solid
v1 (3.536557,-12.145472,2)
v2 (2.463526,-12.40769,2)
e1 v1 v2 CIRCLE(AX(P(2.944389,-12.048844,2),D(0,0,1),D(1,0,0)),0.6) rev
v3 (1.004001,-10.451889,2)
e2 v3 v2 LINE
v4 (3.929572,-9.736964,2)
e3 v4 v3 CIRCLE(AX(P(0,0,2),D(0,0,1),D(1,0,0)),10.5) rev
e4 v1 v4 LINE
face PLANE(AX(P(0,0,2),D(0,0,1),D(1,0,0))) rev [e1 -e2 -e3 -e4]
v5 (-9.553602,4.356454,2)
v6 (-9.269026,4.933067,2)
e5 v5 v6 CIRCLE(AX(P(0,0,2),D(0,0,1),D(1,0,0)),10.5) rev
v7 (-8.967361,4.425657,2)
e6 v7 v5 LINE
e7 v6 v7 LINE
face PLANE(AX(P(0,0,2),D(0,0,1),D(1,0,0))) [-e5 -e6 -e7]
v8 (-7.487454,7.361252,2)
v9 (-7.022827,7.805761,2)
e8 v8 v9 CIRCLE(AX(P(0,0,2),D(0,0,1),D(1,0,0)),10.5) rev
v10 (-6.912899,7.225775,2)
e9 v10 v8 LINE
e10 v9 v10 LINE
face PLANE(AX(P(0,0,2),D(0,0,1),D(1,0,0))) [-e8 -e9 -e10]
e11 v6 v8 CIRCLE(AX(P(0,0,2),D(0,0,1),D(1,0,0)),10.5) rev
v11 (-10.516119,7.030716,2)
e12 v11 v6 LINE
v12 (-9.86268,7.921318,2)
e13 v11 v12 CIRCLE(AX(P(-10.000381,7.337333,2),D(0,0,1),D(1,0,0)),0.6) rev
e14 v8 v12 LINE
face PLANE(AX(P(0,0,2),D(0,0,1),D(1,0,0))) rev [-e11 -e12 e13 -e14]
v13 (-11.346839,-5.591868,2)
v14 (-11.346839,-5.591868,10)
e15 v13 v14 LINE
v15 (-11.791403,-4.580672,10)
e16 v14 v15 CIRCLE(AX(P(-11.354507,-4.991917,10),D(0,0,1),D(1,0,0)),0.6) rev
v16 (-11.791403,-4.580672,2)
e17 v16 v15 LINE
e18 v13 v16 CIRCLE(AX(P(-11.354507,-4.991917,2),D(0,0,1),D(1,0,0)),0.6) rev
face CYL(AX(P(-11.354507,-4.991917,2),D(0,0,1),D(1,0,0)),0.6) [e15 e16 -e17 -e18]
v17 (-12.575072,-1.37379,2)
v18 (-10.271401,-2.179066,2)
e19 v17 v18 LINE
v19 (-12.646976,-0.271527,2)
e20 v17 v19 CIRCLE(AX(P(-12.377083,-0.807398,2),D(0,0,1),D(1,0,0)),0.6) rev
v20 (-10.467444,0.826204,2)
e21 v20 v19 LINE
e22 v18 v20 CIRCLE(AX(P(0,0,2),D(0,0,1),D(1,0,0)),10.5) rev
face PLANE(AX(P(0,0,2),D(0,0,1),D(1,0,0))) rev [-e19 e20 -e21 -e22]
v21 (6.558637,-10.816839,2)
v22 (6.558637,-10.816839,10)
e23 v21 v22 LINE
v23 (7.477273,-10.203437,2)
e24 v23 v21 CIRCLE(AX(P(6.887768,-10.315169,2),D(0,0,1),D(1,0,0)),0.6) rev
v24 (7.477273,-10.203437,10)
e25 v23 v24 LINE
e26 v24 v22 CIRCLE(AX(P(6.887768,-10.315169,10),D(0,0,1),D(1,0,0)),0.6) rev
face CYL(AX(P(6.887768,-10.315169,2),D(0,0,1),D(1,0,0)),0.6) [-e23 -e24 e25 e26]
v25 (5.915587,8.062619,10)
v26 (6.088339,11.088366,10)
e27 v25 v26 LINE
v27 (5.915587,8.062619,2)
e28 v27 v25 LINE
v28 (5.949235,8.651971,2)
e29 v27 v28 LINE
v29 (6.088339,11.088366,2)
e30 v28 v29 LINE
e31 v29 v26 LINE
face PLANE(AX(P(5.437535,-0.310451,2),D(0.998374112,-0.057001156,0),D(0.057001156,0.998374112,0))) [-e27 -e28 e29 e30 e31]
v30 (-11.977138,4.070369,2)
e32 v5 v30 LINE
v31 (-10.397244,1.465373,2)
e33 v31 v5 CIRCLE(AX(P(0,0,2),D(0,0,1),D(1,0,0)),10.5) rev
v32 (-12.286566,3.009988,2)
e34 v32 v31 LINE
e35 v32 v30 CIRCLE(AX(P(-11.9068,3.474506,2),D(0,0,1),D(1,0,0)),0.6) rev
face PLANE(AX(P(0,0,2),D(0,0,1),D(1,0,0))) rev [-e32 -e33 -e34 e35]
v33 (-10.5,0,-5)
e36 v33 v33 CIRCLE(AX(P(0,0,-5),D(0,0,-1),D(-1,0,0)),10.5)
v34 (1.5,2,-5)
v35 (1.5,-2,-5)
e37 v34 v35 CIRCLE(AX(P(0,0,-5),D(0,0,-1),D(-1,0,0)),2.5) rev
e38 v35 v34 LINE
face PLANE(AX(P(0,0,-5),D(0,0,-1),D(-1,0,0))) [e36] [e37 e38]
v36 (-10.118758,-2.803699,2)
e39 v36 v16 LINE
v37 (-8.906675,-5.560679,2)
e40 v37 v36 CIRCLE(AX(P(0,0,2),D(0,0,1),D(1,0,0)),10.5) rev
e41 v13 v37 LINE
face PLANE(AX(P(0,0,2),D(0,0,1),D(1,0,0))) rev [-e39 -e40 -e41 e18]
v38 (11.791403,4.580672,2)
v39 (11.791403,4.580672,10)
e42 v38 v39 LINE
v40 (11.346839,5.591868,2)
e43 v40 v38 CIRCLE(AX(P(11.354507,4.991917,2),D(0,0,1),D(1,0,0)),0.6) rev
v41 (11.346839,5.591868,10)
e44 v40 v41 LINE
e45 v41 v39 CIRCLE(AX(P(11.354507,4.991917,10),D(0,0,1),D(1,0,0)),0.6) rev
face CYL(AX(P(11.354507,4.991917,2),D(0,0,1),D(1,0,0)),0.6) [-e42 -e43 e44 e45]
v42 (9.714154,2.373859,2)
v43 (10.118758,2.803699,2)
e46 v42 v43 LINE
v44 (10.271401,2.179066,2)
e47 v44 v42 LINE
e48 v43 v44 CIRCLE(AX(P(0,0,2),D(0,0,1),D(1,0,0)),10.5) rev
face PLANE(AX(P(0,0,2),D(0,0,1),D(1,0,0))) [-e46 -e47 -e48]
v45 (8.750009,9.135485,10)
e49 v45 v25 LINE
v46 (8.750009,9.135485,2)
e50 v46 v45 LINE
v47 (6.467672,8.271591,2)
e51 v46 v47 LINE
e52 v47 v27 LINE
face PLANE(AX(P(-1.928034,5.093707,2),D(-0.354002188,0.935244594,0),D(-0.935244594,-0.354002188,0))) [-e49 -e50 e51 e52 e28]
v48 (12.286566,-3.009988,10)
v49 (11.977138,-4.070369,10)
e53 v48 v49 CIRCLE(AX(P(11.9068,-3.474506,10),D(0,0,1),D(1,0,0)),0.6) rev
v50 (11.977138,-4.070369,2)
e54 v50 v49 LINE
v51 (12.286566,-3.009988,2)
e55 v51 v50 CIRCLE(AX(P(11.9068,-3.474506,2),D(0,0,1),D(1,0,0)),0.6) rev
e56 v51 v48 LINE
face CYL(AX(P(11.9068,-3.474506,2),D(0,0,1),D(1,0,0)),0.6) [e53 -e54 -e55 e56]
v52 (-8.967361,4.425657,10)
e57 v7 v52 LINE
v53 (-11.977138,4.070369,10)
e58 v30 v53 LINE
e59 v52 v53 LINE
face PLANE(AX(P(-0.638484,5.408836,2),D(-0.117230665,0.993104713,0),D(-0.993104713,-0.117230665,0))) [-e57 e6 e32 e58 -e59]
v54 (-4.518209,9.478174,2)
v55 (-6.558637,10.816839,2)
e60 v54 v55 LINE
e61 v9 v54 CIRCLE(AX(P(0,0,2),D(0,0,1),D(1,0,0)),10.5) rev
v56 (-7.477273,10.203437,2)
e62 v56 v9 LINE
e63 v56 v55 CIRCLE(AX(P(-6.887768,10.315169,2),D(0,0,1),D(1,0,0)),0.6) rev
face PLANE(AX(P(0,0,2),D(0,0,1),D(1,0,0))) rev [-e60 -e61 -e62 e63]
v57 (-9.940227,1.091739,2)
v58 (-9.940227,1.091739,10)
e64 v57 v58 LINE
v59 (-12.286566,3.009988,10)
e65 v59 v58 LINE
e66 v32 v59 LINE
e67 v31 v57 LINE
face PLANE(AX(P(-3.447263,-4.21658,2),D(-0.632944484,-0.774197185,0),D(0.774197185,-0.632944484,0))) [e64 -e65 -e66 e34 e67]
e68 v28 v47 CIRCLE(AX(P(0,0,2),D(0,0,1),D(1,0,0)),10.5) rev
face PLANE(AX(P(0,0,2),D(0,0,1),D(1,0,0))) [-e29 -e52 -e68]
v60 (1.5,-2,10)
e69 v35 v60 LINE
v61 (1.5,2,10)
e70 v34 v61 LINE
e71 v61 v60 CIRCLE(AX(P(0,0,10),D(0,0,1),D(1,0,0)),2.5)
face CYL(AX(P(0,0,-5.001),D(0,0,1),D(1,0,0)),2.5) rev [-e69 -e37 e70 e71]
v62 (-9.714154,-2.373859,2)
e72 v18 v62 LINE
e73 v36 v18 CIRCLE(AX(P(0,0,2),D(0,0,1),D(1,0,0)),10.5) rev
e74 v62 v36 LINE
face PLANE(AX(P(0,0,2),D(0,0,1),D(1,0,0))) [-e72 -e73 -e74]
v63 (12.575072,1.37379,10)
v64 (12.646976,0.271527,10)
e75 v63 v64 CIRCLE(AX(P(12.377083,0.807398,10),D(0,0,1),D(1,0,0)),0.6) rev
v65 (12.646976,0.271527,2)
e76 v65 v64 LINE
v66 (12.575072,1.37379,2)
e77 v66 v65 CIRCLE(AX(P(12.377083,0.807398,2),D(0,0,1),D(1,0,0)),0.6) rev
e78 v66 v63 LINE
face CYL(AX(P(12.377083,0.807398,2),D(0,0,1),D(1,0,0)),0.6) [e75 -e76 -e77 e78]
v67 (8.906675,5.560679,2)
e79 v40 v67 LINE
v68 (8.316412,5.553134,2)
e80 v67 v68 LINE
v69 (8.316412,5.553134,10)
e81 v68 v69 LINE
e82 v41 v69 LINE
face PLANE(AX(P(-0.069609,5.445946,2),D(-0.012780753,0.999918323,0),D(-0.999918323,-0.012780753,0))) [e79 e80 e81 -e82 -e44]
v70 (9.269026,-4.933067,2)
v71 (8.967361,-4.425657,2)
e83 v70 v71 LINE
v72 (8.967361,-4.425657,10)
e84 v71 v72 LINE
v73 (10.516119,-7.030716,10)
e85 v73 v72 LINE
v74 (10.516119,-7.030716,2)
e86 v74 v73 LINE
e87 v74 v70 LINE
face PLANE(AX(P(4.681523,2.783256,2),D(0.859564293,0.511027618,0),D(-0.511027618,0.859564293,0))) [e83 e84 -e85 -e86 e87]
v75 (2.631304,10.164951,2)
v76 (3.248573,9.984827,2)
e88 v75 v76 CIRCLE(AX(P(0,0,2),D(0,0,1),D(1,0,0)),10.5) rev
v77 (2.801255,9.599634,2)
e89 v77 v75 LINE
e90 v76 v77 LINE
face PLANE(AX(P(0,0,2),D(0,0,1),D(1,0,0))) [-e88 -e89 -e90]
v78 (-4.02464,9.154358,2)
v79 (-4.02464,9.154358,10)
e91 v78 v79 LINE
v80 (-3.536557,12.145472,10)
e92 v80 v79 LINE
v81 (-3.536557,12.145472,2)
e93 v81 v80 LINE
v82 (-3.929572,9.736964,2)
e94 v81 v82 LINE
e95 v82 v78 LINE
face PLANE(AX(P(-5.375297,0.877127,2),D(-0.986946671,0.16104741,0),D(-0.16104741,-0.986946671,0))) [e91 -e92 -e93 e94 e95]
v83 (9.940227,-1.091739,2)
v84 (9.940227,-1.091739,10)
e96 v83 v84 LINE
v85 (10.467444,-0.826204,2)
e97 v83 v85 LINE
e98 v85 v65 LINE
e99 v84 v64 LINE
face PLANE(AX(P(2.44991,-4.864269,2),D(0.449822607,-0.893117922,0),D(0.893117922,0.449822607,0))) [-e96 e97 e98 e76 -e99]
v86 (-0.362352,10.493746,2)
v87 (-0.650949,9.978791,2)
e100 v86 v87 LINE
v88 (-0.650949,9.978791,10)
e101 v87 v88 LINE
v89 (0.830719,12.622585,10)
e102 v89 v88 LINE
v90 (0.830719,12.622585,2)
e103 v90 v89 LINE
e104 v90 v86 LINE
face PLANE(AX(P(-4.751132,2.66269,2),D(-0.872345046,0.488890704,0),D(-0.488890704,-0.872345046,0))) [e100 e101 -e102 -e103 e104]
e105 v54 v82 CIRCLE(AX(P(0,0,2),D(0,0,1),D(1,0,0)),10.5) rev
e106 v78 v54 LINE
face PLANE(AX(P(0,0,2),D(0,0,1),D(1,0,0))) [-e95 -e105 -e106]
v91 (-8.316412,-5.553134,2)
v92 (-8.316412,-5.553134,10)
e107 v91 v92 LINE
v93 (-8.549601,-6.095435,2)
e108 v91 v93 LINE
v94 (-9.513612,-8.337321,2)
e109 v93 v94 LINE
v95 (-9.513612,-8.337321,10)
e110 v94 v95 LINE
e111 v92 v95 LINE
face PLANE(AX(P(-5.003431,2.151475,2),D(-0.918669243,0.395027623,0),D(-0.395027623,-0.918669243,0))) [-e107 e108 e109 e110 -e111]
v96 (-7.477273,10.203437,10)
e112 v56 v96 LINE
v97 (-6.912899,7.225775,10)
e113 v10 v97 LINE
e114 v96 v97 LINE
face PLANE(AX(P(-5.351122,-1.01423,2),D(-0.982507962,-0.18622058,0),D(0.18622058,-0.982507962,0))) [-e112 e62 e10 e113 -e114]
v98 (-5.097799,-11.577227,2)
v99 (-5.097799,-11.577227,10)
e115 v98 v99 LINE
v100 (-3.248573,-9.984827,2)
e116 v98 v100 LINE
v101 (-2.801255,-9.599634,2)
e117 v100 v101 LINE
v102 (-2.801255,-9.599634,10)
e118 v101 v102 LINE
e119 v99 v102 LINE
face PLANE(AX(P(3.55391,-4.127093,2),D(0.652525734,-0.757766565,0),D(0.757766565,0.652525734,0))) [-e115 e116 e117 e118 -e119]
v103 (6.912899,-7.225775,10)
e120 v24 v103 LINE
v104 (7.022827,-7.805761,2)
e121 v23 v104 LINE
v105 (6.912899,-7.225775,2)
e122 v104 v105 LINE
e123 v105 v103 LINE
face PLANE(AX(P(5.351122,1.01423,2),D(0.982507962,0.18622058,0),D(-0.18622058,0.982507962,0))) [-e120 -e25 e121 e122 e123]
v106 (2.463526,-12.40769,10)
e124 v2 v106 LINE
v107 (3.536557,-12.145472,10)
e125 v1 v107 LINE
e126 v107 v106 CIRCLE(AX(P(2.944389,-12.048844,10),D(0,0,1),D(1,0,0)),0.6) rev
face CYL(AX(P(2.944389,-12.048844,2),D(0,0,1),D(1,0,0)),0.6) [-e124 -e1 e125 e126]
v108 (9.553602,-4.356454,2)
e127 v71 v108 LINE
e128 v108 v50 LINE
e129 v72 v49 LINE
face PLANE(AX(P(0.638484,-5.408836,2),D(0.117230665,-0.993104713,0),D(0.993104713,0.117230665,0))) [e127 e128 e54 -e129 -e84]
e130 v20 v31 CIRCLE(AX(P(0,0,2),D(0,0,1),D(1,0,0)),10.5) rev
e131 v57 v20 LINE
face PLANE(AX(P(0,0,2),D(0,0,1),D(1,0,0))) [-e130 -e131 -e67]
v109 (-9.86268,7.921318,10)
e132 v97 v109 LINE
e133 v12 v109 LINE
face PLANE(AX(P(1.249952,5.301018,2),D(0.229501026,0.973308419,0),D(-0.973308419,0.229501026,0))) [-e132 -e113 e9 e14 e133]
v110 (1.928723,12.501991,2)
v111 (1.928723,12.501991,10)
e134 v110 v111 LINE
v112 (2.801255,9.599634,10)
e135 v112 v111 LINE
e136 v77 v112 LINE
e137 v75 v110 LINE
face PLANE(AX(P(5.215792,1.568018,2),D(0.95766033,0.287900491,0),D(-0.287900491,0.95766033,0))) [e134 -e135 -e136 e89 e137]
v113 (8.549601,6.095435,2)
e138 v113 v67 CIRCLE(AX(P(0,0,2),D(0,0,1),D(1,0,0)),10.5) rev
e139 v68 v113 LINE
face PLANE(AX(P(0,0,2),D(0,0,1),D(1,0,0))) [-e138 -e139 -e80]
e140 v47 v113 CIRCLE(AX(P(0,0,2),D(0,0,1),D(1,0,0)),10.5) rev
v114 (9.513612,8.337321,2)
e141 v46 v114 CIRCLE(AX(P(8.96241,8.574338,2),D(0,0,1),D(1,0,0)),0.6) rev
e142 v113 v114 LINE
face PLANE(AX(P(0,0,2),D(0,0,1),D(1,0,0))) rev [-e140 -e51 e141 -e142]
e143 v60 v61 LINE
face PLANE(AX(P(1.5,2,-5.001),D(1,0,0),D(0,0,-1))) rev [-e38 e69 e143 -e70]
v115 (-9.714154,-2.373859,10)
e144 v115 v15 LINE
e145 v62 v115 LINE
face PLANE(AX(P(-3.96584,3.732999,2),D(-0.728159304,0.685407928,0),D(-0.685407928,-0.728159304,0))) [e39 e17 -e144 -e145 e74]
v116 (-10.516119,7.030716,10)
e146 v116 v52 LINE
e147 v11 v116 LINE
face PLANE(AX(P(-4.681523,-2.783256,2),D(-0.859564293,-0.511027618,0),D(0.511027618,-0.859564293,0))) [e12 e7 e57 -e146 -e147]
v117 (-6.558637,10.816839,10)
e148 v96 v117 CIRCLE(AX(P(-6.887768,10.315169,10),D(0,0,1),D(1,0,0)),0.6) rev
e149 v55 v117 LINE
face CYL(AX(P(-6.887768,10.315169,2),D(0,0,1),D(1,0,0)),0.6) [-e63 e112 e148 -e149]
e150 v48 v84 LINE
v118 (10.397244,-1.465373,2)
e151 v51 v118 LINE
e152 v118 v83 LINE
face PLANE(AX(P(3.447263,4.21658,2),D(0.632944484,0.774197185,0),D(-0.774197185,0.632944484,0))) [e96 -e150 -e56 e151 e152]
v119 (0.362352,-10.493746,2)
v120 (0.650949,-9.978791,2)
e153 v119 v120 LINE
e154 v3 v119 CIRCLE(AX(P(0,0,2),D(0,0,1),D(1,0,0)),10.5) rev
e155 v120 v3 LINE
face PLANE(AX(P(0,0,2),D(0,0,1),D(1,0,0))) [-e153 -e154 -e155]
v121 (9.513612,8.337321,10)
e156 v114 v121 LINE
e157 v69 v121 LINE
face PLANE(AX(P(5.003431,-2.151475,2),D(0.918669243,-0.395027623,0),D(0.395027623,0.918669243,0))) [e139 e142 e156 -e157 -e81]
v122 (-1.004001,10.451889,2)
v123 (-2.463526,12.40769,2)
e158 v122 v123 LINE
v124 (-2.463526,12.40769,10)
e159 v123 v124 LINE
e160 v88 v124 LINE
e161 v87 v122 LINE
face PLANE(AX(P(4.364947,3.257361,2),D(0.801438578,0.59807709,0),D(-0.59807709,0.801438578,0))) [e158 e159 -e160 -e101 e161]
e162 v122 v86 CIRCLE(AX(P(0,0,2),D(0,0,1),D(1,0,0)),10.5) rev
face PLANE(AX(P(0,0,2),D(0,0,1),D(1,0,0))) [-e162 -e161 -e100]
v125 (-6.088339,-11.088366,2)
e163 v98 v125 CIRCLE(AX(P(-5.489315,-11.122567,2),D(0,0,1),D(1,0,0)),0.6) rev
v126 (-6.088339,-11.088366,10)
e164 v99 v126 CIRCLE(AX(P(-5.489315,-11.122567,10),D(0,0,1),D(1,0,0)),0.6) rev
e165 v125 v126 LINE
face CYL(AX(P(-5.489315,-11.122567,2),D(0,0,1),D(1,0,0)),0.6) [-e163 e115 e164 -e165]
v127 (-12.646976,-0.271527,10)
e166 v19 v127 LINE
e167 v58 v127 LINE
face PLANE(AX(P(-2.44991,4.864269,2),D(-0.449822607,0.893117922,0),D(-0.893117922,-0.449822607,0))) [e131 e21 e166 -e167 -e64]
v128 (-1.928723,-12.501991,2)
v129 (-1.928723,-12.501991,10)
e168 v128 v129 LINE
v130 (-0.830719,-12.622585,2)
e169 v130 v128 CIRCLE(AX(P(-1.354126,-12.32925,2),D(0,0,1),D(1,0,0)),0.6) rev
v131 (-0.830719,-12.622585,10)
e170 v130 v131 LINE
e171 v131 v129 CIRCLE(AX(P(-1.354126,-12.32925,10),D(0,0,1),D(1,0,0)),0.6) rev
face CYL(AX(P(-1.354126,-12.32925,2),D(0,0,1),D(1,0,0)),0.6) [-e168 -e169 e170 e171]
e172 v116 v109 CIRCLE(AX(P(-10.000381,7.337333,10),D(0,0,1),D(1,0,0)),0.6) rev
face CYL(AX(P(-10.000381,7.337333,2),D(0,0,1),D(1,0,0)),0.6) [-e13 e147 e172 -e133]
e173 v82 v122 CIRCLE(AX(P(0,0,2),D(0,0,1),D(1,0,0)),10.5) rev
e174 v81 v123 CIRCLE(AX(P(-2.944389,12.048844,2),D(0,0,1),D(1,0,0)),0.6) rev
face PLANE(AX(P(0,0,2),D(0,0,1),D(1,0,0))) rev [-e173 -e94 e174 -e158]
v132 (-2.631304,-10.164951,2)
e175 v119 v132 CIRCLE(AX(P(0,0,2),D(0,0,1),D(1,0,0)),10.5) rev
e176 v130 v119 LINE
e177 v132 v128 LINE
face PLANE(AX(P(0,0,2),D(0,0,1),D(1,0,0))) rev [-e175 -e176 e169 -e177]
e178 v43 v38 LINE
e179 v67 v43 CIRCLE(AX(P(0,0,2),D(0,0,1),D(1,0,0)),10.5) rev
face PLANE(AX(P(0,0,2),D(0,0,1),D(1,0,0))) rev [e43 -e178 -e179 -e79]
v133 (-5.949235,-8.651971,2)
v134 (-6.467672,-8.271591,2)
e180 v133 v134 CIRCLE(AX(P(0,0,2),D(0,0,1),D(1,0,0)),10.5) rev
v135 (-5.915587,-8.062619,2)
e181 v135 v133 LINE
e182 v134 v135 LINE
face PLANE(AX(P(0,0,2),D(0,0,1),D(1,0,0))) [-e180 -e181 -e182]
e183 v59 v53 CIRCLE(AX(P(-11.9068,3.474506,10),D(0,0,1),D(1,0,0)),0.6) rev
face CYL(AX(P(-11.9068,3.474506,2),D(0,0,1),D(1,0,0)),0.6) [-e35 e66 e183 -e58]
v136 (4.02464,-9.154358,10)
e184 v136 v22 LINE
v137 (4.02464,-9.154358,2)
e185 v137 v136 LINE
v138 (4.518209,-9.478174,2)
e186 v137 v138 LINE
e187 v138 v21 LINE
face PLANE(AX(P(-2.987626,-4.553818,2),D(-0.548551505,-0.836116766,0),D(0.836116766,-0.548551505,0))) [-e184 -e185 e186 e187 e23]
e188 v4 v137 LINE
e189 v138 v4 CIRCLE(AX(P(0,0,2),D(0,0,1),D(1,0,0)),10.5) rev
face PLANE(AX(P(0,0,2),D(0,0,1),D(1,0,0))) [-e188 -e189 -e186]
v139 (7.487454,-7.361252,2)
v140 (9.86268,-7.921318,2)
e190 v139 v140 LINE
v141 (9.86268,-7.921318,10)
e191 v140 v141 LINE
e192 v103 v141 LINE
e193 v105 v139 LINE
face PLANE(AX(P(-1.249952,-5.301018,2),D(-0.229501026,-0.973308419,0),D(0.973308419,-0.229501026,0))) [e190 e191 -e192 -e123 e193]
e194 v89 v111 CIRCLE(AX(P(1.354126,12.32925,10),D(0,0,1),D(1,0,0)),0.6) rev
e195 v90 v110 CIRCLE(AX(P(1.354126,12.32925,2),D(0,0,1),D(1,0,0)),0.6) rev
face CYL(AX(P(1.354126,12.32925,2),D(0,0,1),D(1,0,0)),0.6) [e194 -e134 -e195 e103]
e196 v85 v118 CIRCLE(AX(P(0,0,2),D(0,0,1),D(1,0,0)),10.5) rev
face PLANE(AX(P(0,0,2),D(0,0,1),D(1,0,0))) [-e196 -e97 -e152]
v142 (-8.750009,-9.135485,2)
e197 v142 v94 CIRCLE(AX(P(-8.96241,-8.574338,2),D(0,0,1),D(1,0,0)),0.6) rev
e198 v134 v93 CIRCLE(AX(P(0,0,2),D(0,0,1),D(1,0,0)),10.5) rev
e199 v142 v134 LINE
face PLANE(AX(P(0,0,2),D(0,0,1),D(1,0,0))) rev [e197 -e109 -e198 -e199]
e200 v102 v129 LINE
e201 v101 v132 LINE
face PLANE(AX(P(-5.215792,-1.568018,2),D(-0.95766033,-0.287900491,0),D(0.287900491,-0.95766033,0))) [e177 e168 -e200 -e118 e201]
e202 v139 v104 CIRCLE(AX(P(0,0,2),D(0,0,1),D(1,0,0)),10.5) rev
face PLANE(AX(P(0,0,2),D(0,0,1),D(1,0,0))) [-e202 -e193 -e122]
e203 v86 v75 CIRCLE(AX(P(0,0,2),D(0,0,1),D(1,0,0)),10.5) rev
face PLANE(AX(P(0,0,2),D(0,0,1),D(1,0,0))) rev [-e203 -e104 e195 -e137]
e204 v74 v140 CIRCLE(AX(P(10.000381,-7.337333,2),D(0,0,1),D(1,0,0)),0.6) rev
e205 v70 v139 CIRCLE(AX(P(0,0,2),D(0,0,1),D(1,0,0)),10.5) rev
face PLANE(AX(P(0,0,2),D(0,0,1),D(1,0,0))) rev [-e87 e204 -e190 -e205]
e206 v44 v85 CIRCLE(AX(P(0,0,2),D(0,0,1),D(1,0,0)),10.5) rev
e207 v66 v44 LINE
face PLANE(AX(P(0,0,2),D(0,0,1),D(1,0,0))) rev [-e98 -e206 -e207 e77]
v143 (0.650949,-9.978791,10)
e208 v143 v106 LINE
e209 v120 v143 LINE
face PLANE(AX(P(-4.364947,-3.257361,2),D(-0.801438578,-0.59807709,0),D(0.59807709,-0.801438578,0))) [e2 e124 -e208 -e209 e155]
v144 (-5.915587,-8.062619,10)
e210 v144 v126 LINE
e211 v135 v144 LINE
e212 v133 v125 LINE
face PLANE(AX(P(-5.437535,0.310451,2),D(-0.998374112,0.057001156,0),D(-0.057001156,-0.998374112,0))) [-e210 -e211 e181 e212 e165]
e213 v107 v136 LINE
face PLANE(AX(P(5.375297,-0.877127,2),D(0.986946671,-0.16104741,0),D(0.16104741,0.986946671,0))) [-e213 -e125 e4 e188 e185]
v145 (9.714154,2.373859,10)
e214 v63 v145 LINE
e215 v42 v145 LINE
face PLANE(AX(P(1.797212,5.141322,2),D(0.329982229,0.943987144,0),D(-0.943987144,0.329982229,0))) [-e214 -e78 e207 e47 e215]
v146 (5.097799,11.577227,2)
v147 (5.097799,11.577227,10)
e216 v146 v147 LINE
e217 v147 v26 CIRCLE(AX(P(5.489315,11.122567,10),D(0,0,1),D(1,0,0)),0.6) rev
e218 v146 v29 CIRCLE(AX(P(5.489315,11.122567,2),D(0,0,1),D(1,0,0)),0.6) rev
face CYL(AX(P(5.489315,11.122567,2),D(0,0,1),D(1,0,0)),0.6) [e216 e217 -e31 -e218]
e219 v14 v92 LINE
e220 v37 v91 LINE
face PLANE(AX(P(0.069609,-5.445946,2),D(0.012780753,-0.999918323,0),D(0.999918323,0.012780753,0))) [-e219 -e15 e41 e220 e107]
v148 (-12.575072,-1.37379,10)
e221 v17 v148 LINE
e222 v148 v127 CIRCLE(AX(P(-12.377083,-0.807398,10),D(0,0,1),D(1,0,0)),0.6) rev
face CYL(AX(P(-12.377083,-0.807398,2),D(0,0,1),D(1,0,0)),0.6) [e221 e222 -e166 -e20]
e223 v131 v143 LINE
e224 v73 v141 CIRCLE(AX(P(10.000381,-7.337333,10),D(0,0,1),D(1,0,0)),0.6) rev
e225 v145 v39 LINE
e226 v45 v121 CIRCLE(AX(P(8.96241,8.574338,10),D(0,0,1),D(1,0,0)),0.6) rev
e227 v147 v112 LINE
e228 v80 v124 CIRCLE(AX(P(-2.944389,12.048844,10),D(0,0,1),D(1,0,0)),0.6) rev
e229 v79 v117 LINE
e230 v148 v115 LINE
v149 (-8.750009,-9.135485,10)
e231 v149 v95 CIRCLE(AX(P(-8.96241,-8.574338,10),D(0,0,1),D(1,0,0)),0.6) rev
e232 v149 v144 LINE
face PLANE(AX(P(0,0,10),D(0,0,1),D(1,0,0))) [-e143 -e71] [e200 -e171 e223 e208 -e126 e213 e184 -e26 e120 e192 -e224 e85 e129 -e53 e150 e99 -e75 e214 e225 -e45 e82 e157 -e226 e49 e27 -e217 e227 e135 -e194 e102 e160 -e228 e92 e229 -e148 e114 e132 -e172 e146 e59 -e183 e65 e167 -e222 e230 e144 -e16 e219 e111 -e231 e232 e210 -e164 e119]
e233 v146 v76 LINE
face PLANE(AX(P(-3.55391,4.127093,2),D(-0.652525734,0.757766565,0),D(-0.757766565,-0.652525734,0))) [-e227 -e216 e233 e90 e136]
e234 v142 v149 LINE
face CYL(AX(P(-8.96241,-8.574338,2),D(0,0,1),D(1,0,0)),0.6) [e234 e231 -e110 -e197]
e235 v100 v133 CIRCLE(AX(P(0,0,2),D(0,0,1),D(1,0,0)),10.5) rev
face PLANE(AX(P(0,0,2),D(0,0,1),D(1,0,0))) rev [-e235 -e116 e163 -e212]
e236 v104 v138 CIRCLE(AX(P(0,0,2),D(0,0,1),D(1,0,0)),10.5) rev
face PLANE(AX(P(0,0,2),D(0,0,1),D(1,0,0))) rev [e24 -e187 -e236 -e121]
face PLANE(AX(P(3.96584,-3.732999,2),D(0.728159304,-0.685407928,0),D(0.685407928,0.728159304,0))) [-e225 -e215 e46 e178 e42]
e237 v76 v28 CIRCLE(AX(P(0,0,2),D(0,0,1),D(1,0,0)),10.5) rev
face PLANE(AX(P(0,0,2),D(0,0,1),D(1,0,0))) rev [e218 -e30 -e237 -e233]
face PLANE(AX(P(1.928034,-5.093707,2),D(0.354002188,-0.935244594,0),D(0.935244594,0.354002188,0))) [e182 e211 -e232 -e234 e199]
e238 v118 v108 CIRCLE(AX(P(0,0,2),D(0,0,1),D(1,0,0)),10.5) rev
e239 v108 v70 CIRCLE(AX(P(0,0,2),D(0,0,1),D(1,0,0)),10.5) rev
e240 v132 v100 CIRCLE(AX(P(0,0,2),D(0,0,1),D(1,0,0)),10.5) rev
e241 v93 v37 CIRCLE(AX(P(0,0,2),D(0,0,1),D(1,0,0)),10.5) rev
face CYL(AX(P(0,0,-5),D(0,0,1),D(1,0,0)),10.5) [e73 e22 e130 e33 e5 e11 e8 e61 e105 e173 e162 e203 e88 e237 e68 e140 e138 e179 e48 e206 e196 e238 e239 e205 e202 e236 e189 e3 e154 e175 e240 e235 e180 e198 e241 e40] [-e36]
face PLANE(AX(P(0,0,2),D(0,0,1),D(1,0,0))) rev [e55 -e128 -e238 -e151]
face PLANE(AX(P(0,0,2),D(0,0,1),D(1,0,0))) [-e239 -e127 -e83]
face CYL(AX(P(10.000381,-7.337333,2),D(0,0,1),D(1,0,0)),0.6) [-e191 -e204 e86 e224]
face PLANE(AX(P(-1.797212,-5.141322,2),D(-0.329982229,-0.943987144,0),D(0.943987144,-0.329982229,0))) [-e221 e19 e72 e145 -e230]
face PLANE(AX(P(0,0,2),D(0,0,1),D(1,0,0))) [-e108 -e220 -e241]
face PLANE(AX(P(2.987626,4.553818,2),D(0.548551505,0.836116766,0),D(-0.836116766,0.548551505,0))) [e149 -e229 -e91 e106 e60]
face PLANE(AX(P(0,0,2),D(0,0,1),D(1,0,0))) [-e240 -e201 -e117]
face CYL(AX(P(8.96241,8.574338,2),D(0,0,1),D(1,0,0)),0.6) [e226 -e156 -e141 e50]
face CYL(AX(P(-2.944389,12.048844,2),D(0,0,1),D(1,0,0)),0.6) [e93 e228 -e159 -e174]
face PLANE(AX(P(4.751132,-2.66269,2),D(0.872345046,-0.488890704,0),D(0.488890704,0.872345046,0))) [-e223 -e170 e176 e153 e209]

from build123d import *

# Parameters (mm, degrees)
SKETCH1_R                 = 7.5
BOSS_EXTRUDE1_DEPTH       = 10
SKETCH3_R                 = 10.5
BOSS_EXTRUDE2_DEPTH       = 5
CUT_EXTRUDE1_REACH        = 23.107
BOSS_EXTRUDE3_START       = -8
SKETCH4_R                 = 14.5
SKETCH4_R_2               = 7.5
BOSS_EXTRUDE3_DEPTH       = 8
BOSS_EXTRUDE4_OUTLINE_R   = 10.5
BOSS_EXTRUDE4_OUTLINE_R_2 = 7.5
BOSS_EXTRUDE4_DEPTH       = 2
SKETCH6_R                 = 14.465552515
CUT_EXTRUDE2_DEPTH        = 8


# Read off the part's stored shape, not the designer's step: Boss-Extrude4
with BuildPart() as part:
    # Sketch1 → Boss-Extrude1 (new body)
    with BuildSketch(Plane.XY):
        Circle(SKETCH1_R)
    extrude(amount=BOSS_EXTRUDE1_DEPTH)

    # Sketch3 → Boss-Extrude2 (add)
    with BuildSketch(Plane(origin=(0, 0, 0), x_dir=(-1, 0, 0), z_dir=(0, 0, -1))):
        Circle(SKETCH3_R)
    extrude(amount=BOSS_EXTRUDE2_DEPTH)

    # Sketch2 → Cut-Extrude1 (cut, up to next)
    with BuildSketch(Plane.XY.offset(10), mode=Mode.PRIVATE) as cut_extrude1_sk1:
        with BuildLine():
            Line((1.5, 2), (1.5, -2))
            ThreePointArc((1.5, -2), (-2.5, 0), (1.5, 2))
        make_face()
    cut_extrude1_tool1 = extrude(cut_extrude1_sk1.sketch, amount=-CUT_EXTRUDE1_REACH, mode=Mode.PRIVATE) & part.part
    add(cut_extrude1_tool1.solids().sort_by_distance((-0.316718, 0, 10))[0], mode=Mode.SUBTRACT)

    # Sketch4 → Boss-Extrude3 (add)
    with BuildSketch(Plane.XY.offset(10).offset(BOSS_EXTRUDE3_START)):
        Circle(SKETCH4_R)
        with Locations(Location((0, 0, 0), (0, 0, 180))):
            Circle(SKETCH4_R_2, mode=Mode.SUBTRACT)
    extrude(amount=BOSS_EXTRUDE3_DEPTH)

    # Boss-Extrude4 outline → Boss-Extrude4 (add)
    with BuildSketch(Plane.XY):
        Circle(BOSS_EXTRUDE4_OUTLINE_R)
        Circle(BOSS_EXTRUDE4_OUTLINE_R_2, mode=Mode.SUBTRACT)
    extrude(amount=BOSS_EXTRUDE4_DEPTH)

    # Sketch6 → Cut-Extrude2 (cut)
    with BuildSketch(Plane.XY.offset(10)):
        Circle(SKETCH6_R)
        with BuildLine():
            Line((5.915587052, 8.062619291), (6.088339002, 11.088366247))
            ThreePointArc((6.088339002, 11.088366247), (5.754853945, 11.660608595), (5.097799094, 11.57722688))
            Line((5.097799094, 11.57722688), (2.801255295, 9.599633783))
            Line((2.801255295, 9.599633783), (1.92872262, 12.501990517))
            ThreePointArc((1.92872262, 12.501990517), (1.419630763, 12.925663822), (0.830719394, 12.622584645))
            Line((0.830719394, 12.622584645), (-0.650949193, 9.978790766))
            Line((-0.650949193, 9.978790766), (-2.463526175, 12.407690221))
            ThreePointArc((-2.463526175, 12.407690221), (-3.086820841, 12.631693229), (-3.536557325, 12.145472413))
            Line((-3.536557325, 12.145472413), (-4.024639601, 9.154358311))
            Line((-4.024639601, 9.154358311), (-6.558637356, 10.816839366))
            ThreePointArc((-6.558637356, 10.816839366), (-7.220956294, 10.814154009), (-7.477273036, 10.203436959))
            Line((-7.477273036, 10.203436959), (-6.912899076, 7.225775139))
            Line((-6.912899076, 7.225775139), (-9.862680076, 7.921318044))
            ThreePointArc((-9.862680076, 7.921318044), (-10.484137849, 7.692268216), (-10.516119267, 7.030716422))
            Line((-10.516119267, 7.030716422), (-8.967360899, 4.425656845))
            Line((-8.967360899, 4.425656845), (-11.977138021, 4.07036886))
            ThreePointArc((-11.977138021, 4.07036886), (-12.48277765, 3.64258135), (-12.286566313, 3.009987721))
            Line((-12.286566313, 3.009987721), (-9.940226653, 1.09173902))
            Line((-9.940226653, 1.09173902), (-12.646976358, -0.271526881))
            ThreePointArc((-12.646976358, -0.271526881), (-12.97581024, -0.846454586), (-12.575072131, -1.373789921))
            Line((-12.575072131, -1.373789921), (-9.714154371, -2.373858644))
            Line((-9.714154371, -2.373858644), (-11.791402696, -4.580672473))
            ThreePointArc((-11.791402696, -4.580672473), (-11.903768612, -5.233395606), (-11.346838661, -5.591868224))
            Line((-11.346838661, -5.591868224), (-8.316411706, -5.553133921))
            Line((-8.316411706, -5.553133921), (-9.513611846, -8.337321361))
            ThreePointArc((-9.513611846, -8.337321361), (-9.395956809, -8.98911188), (-8.750008988, -9.135484692))
            Line((-8.750008988, -9.135484692), (-5.915587052, -8.062619291))
            Line((-5.915587052, -8.062619291), (-6.088339002, -11.088366247))
            ThreePointArc((-6.088339002, -11.088366247), (-5.754853945, -11.660608595), (-5.097799094, -11.57722688))
            Line((-5.097799094, -11.57722688), (-2.801255295, -9.599633783))
            Line((-2.801255295, -9.599633783), (-1.92872262, -12.501990517))
            ThreePointArc((-1.92872262, -12.501990517), (-1.419630763, -12.925663822), (-0.830719394, -12.622584645))
            Line((-0.830719394, -12.622584645), (0.650949193, -9.978790766))
            Line((0.650949193, -9.978790766), (2.463526175, -12.407690221))
            ThreePointArc((2.463526175, -12.407690221), (3.086820841, -12.631693229), (3.536557325, -12.145472413))
            Line((3.536557325, -12.145472413), (4.024639601, -9.154358311))
            Line((4.024639601, -9.154358311), (6.558637356, -10.816839366))
            ThreePointArc((6.558637356, -10.816839366), (7.220956294, -10.814154009), (7.477273036, -10.203436959))
            Line((7.477273036, -10.203436959), (6.912899076, -7.225775139))
            Line((6.912899076, -7.225775139), (9.862680076, -7.921318044))
            ThreePointArc((9.862680076, -7.921318044), (10.484137849, -7.692268216), (10.516119267, -7.030716422))
            Line((10.516119267, -7.030716422), (8.967360899, -4.425656845))
            Line((8.967360899, -4.425656845), (11.977138021, -4.07036886))
            ThreePointArc((11.977138021, -4.07036886), (12.48277765, -3.64258135), (12.286566313, -3.009987721))
            Line((12.286566313, -3.009987721), (9.940226653, -1.09173902))
            Line((9.940226653, -1.09173902), (12.646976358, 0.271526881))
            ThreePointArc((12.646976358, 0.271526881), (12.97581024, 0.846454586), (12.575072131, 1.373789921))
            Line((12.575072131, 1.373789921), (9.714154371, 2.373858644))
            Line((9.714154371, 2.373858644), (11.791402696, 4.580672473))
            ThreePointArc((11.791402696, 4.580672473), (11.903768612, 5.233395606), (11.346838661, 5.591868224))
            Line((11.346838661, 5.591868224), (8.316411706, 5.553133921))
            Line((8.316411706, 5.553133921), (9.513611846, 8.337321361))
            ThreePointArc((9.513611846, 8.337321361), (9.395956809, 8.98911188), (8.750008988, 9.135484692))
            Line((8.750008988, 9.135484692), (5.915587052, 8.062619291))
        make_face(mode=Mode.SUBTRACT)
    extrude(amount=-CUT_EXTRUDE2_DEPTH, mode=Mode.SUBTRACT)


with BuildPart() as body_2:
    # of the pieces the cut leaves, the one that is kept (cut_extrude2_keep)
    add(part.part.solids().sort_by_distance((-10.5, 0, 0))[0])


solid = body_2.part
